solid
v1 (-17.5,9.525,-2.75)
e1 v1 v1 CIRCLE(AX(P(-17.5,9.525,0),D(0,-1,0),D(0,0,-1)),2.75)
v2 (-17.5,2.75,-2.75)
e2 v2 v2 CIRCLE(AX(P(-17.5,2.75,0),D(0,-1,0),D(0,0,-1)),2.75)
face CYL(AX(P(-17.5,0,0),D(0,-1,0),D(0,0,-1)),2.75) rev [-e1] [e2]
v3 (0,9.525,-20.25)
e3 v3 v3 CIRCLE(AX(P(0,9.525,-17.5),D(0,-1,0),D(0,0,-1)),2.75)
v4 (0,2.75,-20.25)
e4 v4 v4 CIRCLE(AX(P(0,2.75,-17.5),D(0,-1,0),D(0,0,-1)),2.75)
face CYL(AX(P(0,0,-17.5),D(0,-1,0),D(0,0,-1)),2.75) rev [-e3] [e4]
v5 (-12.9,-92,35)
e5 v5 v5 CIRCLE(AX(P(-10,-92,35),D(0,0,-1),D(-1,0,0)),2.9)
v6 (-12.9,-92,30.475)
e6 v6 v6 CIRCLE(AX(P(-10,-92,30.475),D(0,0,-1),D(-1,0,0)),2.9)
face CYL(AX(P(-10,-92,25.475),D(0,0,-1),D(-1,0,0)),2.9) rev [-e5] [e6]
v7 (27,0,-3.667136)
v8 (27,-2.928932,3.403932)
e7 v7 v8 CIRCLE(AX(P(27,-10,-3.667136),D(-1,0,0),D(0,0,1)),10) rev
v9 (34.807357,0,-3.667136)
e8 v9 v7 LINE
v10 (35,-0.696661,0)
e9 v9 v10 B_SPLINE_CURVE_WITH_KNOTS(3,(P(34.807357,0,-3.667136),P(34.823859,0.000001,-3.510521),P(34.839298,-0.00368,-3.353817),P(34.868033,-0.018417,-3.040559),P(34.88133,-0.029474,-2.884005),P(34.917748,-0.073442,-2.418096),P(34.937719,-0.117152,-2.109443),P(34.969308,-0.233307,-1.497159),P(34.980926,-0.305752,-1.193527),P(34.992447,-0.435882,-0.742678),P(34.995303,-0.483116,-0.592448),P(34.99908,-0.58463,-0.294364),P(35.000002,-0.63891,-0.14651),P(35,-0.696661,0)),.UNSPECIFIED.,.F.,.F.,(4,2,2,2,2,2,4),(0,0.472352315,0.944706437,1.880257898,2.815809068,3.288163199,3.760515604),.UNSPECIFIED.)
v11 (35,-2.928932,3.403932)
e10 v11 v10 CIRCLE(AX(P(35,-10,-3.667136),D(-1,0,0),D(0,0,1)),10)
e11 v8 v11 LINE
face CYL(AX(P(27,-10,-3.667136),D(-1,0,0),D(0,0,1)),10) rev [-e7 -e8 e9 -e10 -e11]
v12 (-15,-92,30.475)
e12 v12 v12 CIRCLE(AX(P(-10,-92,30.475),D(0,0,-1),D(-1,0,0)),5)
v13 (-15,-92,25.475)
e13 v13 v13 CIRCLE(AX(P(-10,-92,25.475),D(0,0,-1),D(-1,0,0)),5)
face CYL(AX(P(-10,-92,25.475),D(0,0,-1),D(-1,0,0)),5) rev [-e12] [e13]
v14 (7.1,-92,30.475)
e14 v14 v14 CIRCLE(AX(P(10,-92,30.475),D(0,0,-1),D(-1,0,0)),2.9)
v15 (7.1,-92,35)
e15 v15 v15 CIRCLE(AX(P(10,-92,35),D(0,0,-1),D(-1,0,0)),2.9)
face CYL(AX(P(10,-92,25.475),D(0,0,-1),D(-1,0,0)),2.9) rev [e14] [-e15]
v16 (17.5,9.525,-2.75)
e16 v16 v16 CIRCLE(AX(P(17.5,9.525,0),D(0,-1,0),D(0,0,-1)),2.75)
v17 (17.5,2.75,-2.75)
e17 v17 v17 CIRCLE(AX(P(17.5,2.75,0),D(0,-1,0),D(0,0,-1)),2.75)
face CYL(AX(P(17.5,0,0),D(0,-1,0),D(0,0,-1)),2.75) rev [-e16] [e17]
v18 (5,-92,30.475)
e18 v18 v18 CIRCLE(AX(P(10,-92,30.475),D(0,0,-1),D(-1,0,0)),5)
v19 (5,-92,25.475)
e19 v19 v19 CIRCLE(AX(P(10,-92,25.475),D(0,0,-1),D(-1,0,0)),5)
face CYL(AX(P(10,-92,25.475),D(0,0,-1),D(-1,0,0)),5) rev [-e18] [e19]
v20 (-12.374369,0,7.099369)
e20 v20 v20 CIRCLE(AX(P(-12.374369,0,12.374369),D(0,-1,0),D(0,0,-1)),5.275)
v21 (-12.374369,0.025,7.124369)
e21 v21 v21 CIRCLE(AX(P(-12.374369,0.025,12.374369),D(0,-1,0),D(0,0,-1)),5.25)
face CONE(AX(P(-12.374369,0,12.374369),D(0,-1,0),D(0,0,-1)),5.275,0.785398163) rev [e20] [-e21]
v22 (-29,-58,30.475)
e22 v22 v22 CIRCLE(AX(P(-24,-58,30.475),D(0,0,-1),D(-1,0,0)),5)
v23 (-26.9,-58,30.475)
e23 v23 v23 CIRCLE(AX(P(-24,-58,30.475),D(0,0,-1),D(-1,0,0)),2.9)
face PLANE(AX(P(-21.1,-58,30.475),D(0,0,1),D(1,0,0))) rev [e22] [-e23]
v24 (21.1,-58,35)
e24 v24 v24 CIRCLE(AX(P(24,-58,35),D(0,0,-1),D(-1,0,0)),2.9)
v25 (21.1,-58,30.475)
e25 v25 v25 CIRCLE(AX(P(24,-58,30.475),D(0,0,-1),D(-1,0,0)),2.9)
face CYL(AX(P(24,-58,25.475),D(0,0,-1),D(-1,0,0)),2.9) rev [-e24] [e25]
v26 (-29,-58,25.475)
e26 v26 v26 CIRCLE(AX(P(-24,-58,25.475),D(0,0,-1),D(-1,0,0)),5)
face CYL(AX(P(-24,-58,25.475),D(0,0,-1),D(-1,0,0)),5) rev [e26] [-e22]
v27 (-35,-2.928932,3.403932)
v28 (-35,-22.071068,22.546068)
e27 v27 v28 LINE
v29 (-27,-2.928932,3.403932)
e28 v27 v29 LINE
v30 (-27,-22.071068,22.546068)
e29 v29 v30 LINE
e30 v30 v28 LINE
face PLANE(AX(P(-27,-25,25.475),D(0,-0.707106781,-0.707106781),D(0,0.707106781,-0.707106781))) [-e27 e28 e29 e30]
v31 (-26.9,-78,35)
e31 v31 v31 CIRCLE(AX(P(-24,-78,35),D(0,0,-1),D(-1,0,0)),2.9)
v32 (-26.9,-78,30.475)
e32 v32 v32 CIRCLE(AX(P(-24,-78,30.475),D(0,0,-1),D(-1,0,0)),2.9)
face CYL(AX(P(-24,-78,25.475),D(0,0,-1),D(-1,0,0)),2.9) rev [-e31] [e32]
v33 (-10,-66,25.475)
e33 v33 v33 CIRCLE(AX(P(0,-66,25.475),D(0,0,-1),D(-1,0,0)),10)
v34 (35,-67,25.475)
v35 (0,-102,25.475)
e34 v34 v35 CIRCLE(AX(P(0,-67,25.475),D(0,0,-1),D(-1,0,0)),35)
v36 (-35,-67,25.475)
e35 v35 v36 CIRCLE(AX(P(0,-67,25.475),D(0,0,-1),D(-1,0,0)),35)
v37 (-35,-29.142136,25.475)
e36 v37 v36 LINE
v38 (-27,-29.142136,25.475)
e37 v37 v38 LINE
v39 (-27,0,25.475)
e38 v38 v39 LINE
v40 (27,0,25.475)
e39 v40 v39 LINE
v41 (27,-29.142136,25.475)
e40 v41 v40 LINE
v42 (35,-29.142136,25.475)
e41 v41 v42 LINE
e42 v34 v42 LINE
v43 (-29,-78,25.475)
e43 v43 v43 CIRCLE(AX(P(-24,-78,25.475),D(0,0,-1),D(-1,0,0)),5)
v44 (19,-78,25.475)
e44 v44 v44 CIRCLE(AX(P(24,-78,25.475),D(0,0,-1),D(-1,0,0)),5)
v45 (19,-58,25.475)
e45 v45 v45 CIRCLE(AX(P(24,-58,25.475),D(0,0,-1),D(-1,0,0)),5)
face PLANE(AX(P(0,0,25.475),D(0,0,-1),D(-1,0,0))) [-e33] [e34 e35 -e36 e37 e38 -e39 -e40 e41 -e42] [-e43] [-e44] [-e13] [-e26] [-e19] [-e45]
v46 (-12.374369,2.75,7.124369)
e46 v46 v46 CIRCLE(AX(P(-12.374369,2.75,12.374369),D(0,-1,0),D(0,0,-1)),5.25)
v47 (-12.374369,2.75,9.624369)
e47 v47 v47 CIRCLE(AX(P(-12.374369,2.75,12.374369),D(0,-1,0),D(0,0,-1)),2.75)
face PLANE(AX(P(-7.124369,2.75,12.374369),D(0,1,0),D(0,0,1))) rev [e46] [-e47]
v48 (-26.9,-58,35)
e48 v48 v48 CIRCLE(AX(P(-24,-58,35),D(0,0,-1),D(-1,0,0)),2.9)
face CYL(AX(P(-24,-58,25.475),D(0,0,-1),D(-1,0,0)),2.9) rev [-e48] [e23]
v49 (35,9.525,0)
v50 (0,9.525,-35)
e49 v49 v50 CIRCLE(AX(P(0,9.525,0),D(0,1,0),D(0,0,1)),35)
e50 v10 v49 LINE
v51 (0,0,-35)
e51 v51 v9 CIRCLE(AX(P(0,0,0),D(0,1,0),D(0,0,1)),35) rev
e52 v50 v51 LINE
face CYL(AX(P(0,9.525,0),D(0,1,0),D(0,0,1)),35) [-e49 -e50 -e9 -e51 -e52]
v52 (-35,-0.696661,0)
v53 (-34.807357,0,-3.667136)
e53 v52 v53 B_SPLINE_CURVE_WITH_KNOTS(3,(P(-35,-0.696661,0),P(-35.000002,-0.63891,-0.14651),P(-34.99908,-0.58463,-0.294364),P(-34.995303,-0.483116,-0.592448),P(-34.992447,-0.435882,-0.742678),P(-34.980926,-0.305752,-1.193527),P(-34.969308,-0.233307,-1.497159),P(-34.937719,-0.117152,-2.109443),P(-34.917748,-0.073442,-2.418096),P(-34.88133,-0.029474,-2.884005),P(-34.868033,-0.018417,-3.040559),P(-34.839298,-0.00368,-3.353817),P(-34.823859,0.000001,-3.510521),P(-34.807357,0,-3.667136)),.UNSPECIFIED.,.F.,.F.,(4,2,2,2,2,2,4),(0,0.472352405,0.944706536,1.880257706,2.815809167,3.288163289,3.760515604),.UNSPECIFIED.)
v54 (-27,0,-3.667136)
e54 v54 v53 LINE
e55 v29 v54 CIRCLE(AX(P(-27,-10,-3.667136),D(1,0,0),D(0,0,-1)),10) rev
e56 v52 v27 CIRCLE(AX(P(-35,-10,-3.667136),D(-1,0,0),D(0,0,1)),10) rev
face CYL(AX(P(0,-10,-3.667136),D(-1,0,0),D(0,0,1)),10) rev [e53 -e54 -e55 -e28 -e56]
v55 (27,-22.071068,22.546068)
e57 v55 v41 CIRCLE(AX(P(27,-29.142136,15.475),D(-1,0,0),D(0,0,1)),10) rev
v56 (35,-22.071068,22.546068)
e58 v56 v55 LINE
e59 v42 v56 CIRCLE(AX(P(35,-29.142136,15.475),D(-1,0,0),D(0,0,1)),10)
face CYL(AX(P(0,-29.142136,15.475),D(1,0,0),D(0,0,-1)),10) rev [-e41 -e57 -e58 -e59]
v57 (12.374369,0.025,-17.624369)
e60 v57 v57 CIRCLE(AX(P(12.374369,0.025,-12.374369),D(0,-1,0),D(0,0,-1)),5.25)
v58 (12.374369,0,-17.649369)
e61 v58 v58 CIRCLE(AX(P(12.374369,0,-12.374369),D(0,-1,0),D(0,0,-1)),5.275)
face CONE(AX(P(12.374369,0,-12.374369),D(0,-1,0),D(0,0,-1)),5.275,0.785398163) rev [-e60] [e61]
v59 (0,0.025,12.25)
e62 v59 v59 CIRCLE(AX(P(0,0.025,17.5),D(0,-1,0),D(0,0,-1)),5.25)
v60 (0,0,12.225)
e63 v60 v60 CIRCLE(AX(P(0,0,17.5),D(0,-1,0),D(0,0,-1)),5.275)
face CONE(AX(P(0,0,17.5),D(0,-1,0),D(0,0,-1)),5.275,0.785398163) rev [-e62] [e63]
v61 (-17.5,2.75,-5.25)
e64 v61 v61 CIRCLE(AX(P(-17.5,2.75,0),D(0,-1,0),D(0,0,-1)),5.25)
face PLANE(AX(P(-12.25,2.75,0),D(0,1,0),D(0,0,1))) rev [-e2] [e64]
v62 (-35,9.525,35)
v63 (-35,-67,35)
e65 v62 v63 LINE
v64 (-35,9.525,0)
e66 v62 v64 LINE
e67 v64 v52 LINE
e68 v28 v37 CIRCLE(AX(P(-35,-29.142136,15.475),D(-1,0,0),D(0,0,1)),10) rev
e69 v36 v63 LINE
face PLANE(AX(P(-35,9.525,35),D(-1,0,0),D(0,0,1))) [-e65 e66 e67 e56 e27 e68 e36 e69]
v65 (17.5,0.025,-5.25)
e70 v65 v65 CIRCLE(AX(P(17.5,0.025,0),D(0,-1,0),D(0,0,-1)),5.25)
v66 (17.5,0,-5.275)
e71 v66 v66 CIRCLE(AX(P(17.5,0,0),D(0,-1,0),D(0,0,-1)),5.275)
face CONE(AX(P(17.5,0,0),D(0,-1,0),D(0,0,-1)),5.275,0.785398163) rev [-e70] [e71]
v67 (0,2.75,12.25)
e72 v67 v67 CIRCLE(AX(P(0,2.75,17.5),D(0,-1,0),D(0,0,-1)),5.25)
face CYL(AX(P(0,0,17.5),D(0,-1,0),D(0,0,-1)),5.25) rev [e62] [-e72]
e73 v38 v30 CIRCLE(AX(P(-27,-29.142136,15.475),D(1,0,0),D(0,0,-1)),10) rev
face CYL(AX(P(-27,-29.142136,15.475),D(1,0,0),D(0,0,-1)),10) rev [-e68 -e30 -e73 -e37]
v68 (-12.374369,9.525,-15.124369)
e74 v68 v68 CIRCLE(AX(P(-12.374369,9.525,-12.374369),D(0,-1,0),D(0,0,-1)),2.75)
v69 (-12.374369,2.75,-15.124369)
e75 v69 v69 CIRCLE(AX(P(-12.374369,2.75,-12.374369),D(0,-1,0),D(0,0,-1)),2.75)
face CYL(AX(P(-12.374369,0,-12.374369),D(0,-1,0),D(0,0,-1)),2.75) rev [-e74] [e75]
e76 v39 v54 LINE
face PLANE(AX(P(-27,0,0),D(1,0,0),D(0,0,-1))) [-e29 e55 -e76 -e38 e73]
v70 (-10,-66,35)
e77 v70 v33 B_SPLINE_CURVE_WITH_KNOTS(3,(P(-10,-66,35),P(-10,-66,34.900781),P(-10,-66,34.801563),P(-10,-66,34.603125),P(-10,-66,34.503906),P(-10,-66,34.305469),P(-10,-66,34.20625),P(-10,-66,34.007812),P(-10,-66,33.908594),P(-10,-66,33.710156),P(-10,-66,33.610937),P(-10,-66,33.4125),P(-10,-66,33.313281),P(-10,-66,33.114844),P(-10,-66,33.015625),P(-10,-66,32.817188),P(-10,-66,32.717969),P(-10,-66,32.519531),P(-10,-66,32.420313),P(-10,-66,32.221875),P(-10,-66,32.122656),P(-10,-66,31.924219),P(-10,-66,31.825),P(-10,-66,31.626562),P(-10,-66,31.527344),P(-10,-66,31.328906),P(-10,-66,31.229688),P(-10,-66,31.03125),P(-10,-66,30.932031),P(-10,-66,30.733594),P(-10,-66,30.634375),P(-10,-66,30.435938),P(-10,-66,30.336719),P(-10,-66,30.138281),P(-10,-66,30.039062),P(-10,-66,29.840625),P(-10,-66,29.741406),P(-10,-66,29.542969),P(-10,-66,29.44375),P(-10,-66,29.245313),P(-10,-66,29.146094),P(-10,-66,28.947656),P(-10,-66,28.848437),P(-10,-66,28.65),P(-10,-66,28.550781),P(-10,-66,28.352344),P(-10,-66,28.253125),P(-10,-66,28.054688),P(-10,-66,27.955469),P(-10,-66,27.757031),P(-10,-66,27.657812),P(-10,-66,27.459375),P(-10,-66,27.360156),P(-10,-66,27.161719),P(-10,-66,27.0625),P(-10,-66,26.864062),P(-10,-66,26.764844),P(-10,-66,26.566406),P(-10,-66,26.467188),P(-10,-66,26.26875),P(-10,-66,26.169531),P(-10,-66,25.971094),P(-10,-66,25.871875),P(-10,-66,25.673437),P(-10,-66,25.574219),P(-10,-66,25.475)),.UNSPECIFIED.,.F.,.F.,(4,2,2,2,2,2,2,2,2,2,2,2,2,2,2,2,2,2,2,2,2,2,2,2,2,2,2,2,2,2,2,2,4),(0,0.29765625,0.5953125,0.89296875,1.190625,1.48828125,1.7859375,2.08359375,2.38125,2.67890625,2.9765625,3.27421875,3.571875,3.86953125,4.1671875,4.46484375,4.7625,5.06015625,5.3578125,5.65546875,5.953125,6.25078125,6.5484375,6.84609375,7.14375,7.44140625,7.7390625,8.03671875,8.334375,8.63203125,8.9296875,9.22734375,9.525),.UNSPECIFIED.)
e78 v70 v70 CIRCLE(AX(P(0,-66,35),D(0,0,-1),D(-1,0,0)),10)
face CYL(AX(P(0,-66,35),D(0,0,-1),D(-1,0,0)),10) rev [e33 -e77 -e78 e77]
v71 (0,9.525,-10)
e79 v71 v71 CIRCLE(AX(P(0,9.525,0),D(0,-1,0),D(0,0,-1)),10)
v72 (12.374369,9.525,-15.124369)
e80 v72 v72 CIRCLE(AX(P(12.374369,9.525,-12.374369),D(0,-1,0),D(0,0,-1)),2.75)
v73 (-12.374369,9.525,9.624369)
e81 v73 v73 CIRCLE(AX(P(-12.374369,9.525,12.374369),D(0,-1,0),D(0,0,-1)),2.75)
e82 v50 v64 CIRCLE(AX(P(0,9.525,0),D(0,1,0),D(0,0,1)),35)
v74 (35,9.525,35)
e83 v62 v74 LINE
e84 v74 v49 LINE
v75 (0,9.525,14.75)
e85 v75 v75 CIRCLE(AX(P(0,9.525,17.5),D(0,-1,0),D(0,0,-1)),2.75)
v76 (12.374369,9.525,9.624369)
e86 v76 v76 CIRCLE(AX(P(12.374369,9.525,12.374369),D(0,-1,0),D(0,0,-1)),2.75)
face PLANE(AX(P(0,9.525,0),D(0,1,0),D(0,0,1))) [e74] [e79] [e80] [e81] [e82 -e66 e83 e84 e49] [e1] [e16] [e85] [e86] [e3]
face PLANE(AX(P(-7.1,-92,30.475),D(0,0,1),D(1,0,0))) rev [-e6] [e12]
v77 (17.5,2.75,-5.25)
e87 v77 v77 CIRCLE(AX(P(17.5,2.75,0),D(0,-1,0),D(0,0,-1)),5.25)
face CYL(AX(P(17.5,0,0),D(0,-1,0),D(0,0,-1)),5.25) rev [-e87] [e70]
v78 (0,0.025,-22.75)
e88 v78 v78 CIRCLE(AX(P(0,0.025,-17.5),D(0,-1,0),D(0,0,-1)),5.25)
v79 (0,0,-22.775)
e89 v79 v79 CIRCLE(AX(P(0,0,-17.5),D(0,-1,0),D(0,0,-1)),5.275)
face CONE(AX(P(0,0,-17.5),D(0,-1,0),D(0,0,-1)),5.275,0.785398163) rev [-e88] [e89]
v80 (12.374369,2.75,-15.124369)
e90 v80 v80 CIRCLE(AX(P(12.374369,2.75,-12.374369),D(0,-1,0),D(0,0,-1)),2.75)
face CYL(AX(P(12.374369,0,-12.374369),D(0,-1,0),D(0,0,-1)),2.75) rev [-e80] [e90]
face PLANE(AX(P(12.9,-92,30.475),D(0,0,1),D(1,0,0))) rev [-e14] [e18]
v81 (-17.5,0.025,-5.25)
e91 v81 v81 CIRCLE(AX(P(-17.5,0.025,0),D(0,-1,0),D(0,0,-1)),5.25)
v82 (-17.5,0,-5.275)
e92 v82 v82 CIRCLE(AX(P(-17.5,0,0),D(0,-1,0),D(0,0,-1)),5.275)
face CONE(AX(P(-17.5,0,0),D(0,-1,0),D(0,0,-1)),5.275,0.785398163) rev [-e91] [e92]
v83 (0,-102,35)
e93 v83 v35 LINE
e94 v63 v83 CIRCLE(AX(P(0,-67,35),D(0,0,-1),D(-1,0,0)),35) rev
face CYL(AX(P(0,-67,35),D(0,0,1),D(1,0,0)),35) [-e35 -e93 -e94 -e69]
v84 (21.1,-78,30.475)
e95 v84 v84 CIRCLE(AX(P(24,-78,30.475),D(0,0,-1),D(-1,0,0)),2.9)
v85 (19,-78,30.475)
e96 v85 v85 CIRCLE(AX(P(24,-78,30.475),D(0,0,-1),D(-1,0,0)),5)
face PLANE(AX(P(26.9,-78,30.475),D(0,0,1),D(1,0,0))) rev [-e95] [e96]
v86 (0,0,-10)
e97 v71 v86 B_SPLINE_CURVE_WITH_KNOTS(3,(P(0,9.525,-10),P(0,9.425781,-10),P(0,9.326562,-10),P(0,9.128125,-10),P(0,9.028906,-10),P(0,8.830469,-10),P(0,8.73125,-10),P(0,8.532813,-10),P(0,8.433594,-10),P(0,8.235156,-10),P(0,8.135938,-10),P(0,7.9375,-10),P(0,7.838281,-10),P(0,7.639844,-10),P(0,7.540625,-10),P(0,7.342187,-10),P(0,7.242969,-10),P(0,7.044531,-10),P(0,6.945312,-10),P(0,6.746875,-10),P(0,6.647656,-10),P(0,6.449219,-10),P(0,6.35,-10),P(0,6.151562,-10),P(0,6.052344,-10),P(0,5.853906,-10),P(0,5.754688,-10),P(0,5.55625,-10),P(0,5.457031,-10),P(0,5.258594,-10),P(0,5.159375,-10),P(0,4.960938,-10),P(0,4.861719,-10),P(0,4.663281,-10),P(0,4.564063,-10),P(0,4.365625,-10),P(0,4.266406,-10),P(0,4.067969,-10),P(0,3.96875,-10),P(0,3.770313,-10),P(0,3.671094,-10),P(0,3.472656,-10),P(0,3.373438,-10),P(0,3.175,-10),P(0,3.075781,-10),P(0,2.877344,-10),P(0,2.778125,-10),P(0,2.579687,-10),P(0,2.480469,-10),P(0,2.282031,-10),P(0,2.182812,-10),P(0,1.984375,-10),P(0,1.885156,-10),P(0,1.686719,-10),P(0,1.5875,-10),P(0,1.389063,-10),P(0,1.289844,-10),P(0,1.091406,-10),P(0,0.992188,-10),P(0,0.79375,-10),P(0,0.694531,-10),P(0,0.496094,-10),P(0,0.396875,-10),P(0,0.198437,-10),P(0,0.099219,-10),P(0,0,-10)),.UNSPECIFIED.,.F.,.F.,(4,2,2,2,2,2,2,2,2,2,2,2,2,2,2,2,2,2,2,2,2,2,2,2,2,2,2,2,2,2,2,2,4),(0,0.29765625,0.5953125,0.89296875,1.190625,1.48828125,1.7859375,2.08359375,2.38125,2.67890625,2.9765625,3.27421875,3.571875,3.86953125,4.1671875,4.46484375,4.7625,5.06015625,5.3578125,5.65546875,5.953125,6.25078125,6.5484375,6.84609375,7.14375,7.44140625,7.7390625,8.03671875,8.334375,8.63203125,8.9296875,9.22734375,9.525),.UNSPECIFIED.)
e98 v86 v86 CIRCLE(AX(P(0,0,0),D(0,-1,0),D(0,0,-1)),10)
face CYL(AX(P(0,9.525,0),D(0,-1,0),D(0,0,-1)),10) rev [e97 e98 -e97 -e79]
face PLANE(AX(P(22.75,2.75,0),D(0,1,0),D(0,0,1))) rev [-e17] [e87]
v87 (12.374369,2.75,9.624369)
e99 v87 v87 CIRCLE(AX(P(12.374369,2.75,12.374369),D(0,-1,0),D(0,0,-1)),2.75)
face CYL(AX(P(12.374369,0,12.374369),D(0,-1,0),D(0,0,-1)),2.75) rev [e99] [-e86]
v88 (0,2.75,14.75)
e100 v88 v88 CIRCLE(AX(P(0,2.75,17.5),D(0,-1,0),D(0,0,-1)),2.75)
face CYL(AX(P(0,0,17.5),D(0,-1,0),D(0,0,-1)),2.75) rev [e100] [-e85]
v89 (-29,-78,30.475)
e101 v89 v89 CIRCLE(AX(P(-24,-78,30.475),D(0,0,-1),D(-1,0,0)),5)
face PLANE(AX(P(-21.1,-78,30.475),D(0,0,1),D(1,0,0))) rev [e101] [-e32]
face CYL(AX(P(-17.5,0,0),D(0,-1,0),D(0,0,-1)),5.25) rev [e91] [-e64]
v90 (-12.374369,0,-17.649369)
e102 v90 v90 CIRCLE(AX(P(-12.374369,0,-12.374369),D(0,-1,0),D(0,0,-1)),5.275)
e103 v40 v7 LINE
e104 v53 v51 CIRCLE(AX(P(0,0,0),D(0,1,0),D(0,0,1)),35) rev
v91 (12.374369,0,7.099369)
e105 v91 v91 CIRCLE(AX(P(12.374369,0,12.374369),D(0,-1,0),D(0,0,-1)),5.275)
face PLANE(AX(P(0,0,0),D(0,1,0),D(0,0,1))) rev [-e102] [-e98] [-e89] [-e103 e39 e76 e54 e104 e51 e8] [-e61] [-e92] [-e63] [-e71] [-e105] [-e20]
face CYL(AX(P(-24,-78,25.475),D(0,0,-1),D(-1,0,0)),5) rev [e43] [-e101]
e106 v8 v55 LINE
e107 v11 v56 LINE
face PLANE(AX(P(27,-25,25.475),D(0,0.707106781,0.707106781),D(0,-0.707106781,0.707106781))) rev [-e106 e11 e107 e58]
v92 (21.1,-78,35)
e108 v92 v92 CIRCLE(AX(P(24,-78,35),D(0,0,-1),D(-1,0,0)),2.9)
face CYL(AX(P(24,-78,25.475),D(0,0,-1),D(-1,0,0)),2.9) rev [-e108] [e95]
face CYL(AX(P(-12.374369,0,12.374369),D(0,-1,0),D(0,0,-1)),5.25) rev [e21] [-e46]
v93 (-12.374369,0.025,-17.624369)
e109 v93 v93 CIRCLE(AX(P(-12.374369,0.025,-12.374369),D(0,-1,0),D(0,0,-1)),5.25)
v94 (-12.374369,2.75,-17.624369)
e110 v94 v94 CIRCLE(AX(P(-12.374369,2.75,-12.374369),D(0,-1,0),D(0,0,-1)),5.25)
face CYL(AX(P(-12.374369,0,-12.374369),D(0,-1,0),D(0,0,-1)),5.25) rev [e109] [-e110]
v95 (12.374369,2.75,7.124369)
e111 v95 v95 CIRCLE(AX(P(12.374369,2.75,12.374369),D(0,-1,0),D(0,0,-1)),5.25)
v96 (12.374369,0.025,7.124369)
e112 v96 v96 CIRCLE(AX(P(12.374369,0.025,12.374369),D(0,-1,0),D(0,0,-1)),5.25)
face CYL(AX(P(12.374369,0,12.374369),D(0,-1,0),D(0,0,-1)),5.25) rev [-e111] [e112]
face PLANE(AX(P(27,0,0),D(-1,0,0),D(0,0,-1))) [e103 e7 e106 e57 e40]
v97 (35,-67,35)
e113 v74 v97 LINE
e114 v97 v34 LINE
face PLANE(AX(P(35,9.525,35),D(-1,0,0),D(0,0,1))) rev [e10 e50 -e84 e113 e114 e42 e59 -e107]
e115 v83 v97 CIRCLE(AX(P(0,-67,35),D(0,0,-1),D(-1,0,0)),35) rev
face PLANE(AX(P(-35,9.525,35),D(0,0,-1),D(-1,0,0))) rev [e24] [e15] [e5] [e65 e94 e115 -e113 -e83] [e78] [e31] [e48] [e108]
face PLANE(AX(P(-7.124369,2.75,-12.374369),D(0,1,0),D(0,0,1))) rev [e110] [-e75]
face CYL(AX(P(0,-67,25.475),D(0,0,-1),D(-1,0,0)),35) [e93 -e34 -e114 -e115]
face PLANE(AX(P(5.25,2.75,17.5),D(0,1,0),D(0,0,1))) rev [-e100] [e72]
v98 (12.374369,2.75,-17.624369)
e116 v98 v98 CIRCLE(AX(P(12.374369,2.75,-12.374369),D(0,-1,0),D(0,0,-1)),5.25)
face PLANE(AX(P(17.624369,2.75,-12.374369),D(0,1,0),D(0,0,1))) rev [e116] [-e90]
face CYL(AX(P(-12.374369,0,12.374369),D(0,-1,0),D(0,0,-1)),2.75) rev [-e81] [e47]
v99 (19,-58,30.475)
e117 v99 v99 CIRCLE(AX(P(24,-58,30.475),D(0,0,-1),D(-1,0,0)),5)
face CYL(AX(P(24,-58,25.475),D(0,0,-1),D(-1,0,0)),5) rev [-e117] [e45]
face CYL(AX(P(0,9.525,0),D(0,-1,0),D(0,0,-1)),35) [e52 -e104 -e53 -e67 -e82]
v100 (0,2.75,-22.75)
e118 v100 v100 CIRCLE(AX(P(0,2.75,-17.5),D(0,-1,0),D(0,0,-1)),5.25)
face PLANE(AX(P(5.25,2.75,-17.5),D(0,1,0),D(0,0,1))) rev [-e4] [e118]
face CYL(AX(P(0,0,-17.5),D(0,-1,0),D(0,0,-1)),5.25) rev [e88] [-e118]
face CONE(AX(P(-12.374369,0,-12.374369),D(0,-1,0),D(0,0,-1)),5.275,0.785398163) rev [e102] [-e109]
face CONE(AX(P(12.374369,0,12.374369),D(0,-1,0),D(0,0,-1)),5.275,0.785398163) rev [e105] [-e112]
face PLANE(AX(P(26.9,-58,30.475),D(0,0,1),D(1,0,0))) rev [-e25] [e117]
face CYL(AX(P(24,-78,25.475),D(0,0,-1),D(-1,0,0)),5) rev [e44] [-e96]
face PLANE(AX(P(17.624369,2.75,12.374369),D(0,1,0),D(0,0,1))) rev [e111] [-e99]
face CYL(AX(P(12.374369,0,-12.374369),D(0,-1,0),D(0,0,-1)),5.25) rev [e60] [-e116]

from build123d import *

# Parameters (mm, degrees)
SKETCH1_W                      = 70
SKETCH1_H                      = 70
BOSS_EXTRUDE1_DEPTH            = 9.525
CBORE_FOR_M5_SBHCS1_AT_2_COUNT = 2
CBORE_FOR_M5_SBHCS1_AT_2_PITCH = 13.393920133
CBORE_FOR_M5_SBHCS1_AT_3_COUNT = 2
CBORE_FOR_M5_SBHCS1_AT_3_PITCH = 24.748737342
CBORE_FOR_M5_SBHCS1_AT_4_COUNT = 2
CBORE_FOR_M5_SBHCS1_AT_4_PITCH = 32.335783638
CBORE_FOR_M5_SBHCS1_AT_5_COUNT = 2
CBORE_FOR_M5_SBHCS1_AT_5_PITCH = 35
CBORE_FOR_M5_SBHCS1_AT_6_COUNT = 2
CBORE_FOR_M5_SBHCS1_AT_6_PITCH = 32.335783638
CBORE_FOR_M5_SBHCS1_AT_7_COUNT = 2
CBORE_FOR_M5_SBHCS1_AT_7_PITCH = 24.748737342
CBORE_FOR_M5_SBHCS1_AT_8_COUNT = 2
CBORE_FOR_M5_SBHCS1_AT_8_PITCH = 13.393920133
SKETCH5_R                      = 10
CUT_EXTRUDE1_DEPTH             = 51.405611047
SKETCH6_W                      = 70
SKETCH6_H                      = 102
BOSS_EXTRUDE2_DEPTH            = 9.525
CBORE_FOR_M5_SHCS1_D           = 5.8
CBORE_FOR_M5_SHCS1_CBORE_D     = 10
CBORE_FOR_M5_SHCS1_CBORE_DEPTH = 5
SKETCH7_R                      = 10
CUT_EXTRUDE3_DEPTH             = 9.525
BOSS_EXTRUDE3_DEPTH            = 8
FILLET1_R                      = 10
FILLET1_OF_MIRROR1_R           = 10
FILLET2_R                      = 35


with BuildPart() as part:
    # Sketch1 → Boss-Extrude1 (new body)
    with BuildSketch(Plane(origin=(0, 0, 0), x_dir=(1, 0, 0), z_dir=(0, 1, 0))):
        Rectangle(SKETCH1_W, SKETCH1_H)
    extrude(amount=BOSS_EXTRUDE1_DEPTH)

    # Sketch4 → CBORE for M5 SBHCS1 (revolve, cut)
    with BuildSketch(Plane(origin=(17.5, 0, 0), x_dir=(0, 0, -1), z_dir=(1, 0, 0))):
        Polygon((0, 0), (0, 9.525), (2.75, 9.525), (2.75, 2.75), (5.25, 2.75), (5.25, 0.025), (5.275, 0), align=None)
    cbore_for_m5_sbhcs1 = revolve(axis=Axis((17.5, -6.35, 0), (0, 1, 0)), mode=Mode.SUBTRACT)

    # CBORE for M5 SBHCS1 at 2: CBORE for M5 SBHCS1 ×2
    with Locations(*[Vector(-0.3826834323650897, 0, -0.9238795325112868) * (i * CBORE_FOR_M5_SBHCS1_AT_2_PITCH) for i in range(1, CBORE_FOR_M5_SBHCS1_AT_2_COUNT)]):
        add(cbore_for_m5_sbhcs1, mode=Mode.SUBTRACT)

    # CBORE for M5 SBHCS1 at 3: CBORE for M5 SBHCS1 ×2
    with Locations(*[Vector(-0.7071067811865476, 0, -0.7071067811865476) * (i * CBORE_FOR_M5_SBHCS1_AT_3_PITCH) for i in range(1, CBORE_FOR_M5_SBHCS1_AT_3_COUNT)]):
        add(cbore_for_m5_sbhcs1, mode=Mode.SUBTRACT)

    # CBORE for M5 SBHCS1 at 4: CBORE for M5 SBHCS1 ×2
    with Locations(*[Vector(-0.9238795325112867, 0, -0.38268343236508984) * (i * CBORE_FOR_M5_SBHCS1_AT_4_PITCH) for i in range(1, CBORE_FOR_M5_SBHCS1_AT_4_COUNT)]):
        add(cbore_for_m5_sbhcs1, mode=Mode.SUBTRACT)

    # CBORE for M5 SBHCS1 at 5: CBORE for M5 SBHCS1 ×2
    with Locations(*[(-i * CBORE_FOR_M5_SBHCS1_AT_5_PITCH, 0, 0) for i in range(1, CBORE_FOR_M5_SBHCS1_AT_5_COUNT)]):
        add(cbore_for_m5_sbhcs1, mode=Mode.SUBTRACT)

    # CBORE for M5 SBHCS1 at 6: CBORE for M5 SBHCS1 ×2
    with Locations(*[Vector(-0.9238795325112868, 0, 0.38268343236508967) * (i * CBORE_FOR_M5_SBHCS1_AT_6_PITCH) for i in range(1, CBORE_FOR_M5_SBHCS1_AT_6_COUNT)]):
        add(cbore_for_m5_sbhcs1, mode=Mode.SUBTRACT)

    # CBORE for M5 SBHCS1 at 7: CBORE for M5 SBHCS1 ×2
    with Locations(*[Vector(-0.7071067811865477, 0, 0.7071067811865475) * (i * CBORE_FOR_M5_SBHCS1_AT_7_PITCH) for i in range(1, CBORE_FOR_M5_SBHCS1_AT_7_COUNT)]):
        add(cbore_for_m5_sbhcs1, mode=Mode.SUBTRACT)

    # CBORE for M5 SBHCS1 at 8: CBORE for M5 SBHCS1 ×2
    with Locations(*[Vector(-0.3826834323650897, 0, 0.9238795325112868) * (i * CBORE_FOR_M5_SBHCS1_AT_8_PITCH) for i in range(1, CBORE_FOR_M5_SBHCS1_AT_8_COUNT)]):
        add(cbore_for_m5_sbhcs1, mode=Mode.SUBTRACT)

    # Sketch5 → Cut-Extrude1 (cut, through all)
    with BuildSketch(Plane.XZ):
        with Locations(Location((0, 0, 0), (0, 0, 270))):
            Circle(SKETCH5_R)
    extrude(amount=-CUT_EXTRUDE1_DEPTH, mode=Mode.SUBTRACT)

    # Sketch6 → Boss-Extrude2 (add)
    with BuildSketch(Plane.XY.offset(35)):
        with Locations((0, -51)):
            Rectangle(SKETCH6_W, SKETCH6_H)
    extrude(amount=-BOSS_EXTRUDE2_DEPTH)

    # CBORE for M5 SHCS1 (through all)
    with Locations(Plane(origin=(0, 0, 25.475), x_dir=(-1, 0, 0), z_dir=(0, 0, -1))):
        with Locations((-24, -58), (-24, -78), (-10, -92), (10, -92), (24, -78), (24, -58)):
            CounterBoreHole(CBORE_FOR_M5_SHCS1_D / 2, CBORE_FOR_M5_SHCS1_CBORE_D / 2, CBORE_FOR_M5_SHCS1_CBORE_DEPTH)

    # Sketch7 → Cut-Extrude3 (cut)
    with BuildSketch(Plane(origin=(0, 0, 25.475), x_dir=(-1, 0, 0), z_dir=(0, 0, -1))):
        with Locations((0, -66)):
            Circle(SKETCH7_R)
    extrude(amount=-CUT_EXTRUDE3_DEPTH, mode=Mode.SUBTRACT)

    # Sketch17 → Boss-Extrude3 (add)
    with BuildSketch(Plane.ZY.offset(35)):
        Polygon((25.475, 0), (25.475, -25), (0.475, 0), align=None)
    boss_extrude3 = extrude(amount=-BOSS_EXTRUDE3_DEPTH)

    # Fillet1
    fillet1_edges = [part.edges().sort_by_distance(p)[0] for p in [
        (-31, 0, 0.475),
        (-31, -25, 25.475),
    ]]
    fillet(fillet1_edges, radius=FILLET1_R)

    # Mirror1: Boss-Extrude3 across plane
    add(boss_extrude3.mirror(Plane(origin=(0, 0, 0), x_dir=(0, 0, 1), z_dir=(1, 0, 0))))

    # Fillet1 of Mirror1
    fillet1_of_mirror1_edges = [part.edges().sort_by_distance(p)[0] for p in [
        (31, 0, 0.475),
        (31, -25, 25.475),
    ]]
    fillet(fillet1_of_mirror1_edges, radius=FILLET1_OF_MIRROR1_R)

    # Fillet2
    fillet2_edges = [part.edges().sort_by_distance(p)[0] for p in [
        (-35, 4.7625, -35),
        (35, 4.7625, -35),
        (35, -102, 30.2375),
        (-35, -102, 30.2375),
    ]]
    fillet(fillet2_edges, radius=FILLET2_R - 0.0001)  # a hair under: the kernel refuses the full size


solid = part.part
